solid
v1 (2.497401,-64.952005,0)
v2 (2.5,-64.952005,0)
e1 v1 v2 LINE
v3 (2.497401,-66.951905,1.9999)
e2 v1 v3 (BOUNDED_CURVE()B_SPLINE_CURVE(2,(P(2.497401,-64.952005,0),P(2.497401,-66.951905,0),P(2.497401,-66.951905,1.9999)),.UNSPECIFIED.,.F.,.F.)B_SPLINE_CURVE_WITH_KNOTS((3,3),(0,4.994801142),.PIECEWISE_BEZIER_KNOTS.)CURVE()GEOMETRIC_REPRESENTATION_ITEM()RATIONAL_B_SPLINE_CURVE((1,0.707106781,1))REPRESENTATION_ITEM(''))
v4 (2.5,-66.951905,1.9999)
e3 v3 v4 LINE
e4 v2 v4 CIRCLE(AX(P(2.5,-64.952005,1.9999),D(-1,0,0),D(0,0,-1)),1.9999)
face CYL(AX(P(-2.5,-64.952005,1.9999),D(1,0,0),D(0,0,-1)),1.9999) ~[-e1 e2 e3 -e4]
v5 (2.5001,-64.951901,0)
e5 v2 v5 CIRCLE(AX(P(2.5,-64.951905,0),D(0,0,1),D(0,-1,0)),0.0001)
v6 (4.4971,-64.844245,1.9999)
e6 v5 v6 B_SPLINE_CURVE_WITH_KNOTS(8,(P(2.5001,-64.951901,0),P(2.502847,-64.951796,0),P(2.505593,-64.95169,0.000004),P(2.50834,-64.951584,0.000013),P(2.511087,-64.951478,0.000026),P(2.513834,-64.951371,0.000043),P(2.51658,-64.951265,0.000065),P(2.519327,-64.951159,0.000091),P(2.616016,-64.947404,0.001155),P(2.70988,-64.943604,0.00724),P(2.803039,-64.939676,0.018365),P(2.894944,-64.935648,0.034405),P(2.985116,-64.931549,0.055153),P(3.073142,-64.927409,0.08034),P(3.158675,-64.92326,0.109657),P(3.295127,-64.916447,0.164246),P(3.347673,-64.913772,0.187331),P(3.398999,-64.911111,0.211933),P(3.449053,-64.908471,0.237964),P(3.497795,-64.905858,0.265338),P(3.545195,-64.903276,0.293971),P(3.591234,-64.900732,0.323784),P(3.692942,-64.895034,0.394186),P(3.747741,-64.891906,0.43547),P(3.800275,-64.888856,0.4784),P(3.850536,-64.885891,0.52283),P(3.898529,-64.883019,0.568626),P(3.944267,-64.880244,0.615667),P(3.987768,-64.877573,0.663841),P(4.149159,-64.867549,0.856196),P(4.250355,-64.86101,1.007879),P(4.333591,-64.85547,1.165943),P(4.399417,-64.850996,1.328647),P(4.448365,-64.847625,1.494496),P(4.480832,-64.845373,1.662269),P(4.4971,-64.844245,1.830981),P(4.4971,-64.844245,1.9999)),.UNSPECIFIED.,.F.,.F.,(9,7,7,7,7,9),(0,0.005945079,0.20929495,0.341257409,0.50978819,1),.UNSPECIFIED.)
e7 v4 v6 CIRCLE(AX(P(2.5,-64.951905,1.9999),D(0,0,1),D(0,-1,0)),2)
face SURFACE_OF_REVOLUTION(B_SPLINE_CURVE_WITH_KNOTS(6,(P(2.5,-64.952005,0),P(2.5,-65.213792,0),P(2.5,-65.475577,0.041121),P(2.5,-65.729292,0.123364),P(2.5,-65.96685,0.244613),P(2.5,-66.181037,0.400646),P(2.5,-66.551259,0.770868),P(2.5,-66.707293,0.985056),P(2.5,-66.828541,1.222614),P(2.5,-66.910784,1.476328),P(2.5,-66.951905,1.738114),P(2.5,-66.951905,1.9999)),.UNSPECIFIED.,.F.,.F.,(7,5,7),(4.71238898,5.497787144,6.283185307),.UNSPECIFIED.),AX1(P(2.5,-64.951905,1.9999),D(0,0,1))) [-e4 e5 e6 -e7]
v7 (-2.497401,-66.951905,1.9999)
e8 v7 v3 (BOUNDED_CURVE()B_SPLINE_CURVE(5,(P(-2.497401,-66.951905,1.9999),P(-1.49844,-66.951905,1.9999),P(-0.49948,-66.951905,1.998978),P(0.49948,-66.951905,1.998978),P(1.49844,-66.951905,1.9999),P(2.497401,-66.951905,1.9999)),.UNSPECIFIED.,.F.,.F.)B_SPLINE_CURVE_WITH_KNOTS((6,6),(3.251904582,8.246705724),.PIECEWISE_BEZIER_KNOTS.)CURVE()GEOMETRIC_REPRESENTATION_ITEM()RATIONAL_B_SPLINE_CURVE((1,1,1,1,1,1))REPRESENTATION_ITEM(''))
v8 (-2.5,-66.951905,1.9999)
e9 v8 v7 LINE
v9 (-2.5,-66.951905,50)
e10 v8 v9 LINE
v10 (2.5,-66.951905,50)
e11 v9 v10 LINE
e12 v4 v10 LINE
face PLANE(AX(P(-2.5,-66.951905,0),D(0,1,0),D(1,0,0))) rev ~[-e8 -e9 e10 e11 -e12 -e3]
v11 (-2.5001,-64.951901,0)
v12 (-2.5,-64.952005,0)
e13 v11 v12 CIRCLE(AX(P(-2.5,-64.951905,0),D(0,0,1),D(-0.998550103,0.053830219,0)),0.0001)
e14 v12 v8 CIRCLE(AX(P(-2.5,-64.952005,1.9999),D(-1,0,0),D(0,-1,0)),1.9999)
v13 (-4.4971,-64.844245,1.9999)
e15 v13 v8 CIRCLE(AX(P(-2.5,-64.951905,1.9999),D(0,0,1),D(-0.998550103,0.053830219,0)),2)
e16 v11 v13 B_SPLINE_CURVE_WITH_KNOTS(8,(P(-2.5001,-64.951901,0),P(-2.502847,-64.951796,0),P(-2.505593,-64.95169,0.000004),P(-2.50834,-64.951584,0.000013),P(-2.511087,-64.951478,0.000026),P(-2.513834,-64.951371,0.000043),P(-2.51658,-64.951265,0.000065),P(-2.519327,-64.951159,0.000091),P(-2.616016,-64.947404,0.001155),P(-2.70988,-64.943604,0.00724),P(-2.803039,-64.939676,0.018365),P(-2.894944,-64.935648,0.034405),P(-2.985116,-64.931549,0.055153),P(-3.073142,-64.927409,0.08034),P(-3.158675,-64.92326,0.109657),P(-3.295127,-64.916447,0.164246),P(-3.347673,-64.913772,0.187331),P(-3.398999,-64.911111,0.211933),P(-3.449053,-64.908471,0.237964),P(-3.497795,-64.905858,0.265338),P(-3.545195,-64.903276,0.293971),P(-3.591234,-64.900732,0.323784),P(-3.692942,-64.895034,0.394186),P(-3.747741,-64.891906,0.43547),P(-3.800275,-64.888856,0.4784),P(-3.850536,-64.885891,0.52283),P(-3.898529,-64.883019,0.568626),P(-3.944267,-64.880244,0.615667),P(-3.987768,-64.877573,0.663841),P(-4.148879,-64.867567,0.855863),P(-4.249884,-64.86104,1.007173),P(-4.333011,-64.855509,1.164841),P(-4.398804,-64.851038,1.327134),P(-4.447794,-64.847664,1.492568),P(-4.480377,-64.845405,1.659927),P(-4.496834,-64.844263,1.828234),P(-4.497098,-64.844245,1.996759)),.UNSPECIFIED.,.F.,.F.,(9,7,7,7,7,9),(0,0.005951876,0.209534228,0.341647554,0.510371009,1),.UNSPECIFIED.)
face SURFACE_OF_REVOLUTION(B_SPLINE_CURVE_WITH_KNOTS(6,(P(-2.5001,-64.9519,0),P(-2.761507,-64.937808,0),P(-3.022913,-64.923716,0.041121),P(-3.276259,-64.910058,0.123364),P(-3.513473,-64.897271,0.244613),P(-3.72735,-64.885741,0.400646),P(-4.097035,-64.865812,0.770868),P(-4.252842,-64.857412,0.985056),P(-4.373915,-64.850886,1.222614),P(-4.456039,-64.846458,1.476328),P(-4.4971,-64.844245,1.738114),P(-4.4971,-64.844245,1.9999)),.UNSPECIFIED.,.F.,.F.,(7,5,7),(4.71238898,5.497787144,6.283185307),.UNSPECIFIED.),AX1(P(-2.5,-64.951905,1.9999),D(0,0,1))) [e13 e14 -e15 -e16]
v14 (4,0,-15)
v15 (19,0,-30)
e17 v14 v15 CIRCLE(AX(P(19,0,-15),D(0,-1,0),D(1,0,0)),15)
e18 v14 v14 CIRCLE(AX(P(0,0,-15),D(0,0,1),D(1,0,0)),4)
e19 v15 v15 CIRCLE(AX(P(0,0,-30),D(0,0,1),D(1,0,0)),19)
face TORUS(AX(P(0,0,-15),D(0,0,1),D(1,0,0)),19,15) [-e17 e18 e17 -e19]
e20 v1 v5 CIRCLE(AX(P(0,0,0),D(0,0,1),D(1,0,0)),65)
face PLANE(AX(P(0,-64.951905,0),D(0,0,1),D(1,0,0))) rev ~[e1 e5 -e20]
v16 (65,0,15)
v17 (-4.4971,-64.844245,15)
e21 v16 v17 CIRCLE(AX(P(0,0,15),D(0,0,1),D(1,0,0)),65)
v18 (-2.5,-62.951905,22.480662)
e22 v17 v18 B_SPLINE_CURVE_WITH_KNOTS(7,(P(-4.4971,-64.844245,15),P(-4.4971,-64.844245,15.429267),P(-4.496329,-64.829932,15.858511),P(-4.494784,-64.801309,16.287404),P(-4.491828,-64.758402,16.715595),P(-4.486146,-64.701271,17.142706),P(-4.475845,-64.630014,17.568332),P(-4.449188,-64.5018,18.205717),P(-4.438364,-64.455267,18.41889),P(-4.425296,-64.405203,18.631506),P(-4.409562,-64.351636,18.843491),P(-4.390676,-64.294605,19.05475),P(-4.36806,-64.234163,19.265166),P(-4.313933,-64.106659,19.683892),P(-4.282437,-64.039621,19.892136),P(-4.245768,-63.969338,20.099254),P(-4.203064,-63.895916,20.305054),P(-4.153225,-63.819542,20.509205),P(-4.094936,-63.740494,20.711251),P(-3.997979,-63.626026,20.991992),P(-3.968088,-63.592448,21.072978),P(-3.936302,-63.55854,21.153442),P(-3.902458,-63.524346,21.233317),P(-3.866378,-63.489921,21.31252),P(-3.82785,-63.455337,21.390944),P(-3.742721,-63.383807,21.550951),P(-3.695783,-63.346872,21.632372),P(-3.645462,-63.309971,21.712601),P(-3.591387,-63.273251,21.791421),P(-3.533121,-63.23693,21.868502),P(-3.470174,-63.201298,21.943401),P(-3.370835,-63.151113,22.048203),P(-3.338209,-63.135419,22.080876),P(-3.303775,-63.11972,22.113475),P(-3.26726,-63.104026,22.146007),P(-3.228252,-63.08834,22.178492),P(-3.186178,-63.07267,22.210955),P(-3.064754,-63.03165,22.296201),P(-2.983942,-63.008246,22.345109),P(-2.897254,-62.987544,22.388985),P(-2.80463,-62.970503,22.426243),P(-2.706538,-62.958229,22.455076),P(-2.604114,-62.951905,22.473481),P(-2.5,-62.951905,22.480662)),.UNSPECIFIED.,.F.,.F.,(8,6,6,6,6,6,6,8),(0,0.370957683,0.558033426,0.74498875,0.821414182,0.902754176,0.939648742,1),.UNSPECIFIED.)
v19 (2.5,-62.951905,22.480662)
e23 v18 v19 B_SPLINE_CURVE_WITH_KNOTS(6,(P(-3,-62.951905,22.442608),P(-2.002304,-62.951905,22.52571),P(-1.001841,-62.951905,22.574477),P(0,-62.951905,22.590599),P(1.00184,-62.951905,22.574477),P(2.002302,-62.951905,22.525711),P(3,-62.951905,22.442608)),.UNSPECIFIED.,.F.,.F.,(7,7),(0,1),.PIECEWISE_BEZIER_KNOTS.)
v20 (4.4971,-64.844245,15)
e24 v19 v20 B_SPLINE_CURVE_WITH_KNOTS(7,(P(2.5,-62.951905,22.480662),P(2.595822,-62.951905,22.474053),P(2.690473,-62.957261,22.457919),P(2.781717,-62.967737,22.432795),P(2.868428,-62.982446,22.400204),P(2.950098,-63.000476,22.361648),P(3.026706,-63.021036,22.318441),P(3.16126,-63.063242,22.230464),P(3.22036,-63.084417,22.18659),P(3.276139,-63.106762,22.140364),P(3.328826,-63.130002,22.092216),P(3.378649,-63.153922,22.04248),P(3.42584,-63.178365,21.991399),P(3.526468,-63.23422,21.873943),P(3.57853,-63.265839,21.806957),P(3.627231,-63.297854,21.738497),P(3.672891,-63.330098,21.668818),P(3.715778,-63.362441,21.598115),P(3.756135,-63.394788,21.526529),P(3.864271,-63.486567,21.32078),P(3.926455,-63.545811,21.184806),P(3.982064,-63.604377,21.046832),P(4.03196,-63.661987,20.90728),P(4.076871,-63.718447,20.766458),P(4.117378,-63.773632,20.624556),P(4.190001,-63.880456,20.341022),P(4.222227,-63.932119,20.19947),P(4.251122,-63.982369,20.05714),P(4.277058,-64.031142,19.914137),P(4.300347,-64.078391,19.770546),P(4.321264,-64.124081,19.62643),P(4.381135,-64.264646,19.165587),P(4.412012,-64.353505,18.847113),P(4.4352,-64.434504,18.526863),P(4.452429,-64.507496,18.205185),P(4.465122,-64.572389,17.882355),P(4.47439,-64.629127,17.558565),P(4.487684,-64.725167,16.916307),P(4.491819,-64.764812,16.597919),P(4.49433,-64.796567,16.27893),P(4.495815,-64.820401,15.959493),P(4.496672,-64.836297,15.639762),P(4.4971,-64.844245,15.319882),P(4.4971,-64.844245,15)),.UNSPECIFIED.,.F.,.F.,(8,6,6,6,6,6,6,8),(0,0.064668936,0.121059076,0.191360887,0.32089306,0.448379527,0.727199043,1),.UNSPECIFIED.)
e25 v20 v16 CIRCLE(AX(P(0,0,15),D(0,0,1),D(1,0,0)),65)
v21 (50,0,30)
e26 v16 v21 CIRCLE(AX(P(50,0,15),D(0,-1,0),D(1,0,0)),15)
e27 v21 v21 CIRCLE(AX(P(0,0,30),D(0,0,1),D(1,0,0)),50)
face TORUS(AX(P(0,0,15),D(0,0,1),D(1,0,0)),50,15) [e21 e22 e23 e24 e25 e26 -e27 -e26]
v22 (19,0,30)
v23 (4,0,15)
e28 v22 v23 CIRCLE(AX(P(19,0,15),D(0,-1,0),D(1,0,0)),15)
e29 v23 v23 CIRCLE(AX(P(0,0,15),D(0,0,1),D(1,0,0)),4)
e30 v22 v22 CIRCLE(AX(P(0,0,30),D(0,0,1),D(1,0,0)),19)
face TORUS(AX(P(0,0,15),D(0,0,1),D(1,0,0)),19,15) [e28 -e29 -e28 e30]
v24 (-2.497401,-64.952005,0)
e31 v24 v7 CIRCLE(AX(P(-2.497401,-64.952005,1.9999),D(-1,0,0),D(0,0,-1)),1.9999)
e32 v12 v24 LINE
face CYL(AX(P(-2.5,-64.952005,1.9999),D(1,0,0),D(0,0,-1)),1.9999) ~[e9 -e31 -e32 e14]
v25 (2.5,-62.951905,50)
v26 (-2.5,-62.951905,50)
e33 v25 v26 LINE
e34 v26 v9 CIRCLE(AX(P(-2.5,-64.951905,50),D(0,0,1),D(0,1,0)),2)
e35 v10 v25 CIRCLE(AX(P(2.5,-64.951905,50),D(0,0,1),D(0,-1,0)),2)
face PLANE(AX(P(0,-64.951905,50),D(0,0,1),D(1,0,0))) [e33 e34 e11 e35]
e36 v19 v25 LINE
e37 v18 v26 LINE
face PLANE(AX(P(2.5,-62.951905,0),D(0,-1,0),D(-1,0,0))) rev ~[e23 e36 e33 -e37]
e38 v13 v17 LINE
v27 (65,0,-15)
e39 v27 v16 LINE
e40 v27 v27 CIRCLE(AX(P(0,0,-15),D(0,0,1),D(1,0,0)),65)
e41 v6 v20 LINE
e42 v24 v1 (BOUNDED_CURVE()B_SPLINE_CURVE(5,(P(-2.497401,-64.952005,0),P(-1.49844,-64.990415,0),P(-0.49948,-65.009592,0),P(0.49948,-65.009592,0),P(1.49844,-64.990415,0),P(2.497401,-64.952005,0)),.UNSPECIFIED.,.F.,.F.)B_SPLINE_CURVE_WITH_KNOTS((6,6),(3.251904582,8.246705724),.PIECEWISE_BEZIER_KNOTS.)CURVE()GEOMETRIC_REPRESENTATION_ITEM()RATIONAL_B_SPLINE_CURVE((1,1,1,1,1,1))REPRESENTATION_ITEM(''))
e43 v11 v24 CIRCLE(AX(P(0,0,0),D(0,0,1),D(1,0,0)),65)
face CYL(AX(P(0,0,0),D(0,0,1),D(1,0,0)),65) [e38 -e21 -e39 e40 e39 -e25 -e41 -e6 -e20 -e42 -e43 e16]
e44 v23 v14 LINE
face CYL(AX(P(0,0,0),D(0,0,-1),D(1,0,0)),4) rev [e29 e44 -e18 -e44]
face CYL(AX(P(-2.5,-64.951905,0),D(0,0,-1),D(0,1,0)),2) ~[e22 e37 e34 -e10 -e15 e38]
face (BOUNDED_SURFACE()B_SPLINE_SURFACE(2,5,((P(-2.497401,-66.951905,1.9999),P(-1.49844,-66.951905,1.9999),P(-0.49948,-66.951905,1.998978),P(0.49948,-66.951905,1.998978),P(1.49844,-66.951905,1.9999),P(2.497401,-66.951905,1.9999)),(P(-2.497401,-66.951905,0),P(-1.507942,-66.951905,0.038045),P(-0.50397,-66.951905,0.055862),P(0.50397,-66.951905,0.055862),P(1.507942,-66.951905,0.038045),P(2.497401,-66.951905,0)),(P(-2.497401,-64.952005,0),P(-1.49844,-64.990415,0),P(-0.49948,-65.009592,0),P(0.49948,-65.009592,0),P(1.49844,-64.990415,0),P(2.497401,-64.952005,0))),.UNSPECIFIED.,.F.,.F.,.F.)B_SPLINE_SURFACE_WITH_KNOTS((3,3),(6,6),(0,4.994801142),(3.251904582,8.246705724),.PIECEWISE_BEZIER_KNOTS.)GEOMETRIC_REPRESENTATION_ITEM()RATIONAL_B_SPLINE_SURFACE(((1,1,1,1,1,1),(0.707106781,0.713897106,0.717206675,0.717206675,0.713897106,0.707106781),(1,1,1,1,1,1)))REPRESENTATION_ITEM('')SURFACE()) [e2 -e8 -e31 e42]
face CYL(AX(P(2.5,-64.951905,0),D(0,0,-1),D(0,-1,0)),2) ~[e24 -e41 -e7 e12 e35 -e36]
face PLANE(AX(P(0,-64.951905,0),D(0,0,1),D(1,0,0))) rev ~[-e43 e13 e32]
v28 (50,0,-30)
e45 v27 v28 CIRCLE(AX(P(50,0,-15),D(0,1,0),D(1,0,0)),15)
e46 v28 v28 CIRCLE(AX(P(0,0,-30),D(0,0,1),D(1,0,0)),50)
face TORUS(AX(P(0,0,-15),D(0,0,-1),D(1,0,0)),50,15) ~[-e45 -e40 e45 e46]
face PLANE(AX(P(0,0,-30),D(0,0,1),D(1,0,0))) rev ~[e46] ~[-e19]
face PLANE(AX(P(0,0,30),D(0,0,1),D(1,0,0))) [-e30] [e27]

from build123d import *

# Parameters (mm, degrees)
F0_R     = 65
F0_R_2   = 4
F1_DEPTH = 30
F2_R     = 15
F4_DEPTH = 50
F5_R     = 1.9999


# Not quite as in the source:
# - a fillet or chamfer is up to 0.001 mm smaller than in the source, because OpenCascade refuses the exact size


with BuildPart() as f1:
    # F0 (on Top) → F1 (new body, symmetric)
    with BuildSketch(Plane.XY):
        Circle(F0_R)
        Circle(F0_R_2, mode=Mode.SUBTRACT)
    extrude(amount=F1_DEPTH, both=True)

    # F2
    f2_edges = [f1.edges().sort_by_distance(p)[0] for p in [
        (-4, 0, 30),
        (4, 0, 0),
        (-4, 0, -30),
        (-65, 0, -30),
        (65, 0, 0),
        (-65, 0, 30),
    ]]
    fillet(f2_edges, radius=F2_R)

    # F3 (on Top) → F4 (join)
    with BuildSketch(Plane.XY):
        with BuildLine():
            Line((2.5, -62.9519052838), (-2.5, -62.9519052838))
            ThreePointArc((-2.5, -62.9519052838), (-4.5, -64.9519052838), (-2.5, -66.9519052838))
            Line((-2.5, -66.9519052838), (2.5, -66.9519052838))
            ThreePointArc((2.5, -66.9519052838), (4.5, -64.9519052838), (2.5, -62.9519052838))
        make_face()
    extrude(amount=F4_DEPTH)

    # F5 (radius 2 in the source; OpenCascade refuses exactly that, so slightly less here)
    f5_edges = [f1.edges().sort_by_distance(p)[0] for p in [
        (0, -66.951905, 0),
    ]]
    fillet(f5_edges, radius=F5_R)


solid = f1.part
